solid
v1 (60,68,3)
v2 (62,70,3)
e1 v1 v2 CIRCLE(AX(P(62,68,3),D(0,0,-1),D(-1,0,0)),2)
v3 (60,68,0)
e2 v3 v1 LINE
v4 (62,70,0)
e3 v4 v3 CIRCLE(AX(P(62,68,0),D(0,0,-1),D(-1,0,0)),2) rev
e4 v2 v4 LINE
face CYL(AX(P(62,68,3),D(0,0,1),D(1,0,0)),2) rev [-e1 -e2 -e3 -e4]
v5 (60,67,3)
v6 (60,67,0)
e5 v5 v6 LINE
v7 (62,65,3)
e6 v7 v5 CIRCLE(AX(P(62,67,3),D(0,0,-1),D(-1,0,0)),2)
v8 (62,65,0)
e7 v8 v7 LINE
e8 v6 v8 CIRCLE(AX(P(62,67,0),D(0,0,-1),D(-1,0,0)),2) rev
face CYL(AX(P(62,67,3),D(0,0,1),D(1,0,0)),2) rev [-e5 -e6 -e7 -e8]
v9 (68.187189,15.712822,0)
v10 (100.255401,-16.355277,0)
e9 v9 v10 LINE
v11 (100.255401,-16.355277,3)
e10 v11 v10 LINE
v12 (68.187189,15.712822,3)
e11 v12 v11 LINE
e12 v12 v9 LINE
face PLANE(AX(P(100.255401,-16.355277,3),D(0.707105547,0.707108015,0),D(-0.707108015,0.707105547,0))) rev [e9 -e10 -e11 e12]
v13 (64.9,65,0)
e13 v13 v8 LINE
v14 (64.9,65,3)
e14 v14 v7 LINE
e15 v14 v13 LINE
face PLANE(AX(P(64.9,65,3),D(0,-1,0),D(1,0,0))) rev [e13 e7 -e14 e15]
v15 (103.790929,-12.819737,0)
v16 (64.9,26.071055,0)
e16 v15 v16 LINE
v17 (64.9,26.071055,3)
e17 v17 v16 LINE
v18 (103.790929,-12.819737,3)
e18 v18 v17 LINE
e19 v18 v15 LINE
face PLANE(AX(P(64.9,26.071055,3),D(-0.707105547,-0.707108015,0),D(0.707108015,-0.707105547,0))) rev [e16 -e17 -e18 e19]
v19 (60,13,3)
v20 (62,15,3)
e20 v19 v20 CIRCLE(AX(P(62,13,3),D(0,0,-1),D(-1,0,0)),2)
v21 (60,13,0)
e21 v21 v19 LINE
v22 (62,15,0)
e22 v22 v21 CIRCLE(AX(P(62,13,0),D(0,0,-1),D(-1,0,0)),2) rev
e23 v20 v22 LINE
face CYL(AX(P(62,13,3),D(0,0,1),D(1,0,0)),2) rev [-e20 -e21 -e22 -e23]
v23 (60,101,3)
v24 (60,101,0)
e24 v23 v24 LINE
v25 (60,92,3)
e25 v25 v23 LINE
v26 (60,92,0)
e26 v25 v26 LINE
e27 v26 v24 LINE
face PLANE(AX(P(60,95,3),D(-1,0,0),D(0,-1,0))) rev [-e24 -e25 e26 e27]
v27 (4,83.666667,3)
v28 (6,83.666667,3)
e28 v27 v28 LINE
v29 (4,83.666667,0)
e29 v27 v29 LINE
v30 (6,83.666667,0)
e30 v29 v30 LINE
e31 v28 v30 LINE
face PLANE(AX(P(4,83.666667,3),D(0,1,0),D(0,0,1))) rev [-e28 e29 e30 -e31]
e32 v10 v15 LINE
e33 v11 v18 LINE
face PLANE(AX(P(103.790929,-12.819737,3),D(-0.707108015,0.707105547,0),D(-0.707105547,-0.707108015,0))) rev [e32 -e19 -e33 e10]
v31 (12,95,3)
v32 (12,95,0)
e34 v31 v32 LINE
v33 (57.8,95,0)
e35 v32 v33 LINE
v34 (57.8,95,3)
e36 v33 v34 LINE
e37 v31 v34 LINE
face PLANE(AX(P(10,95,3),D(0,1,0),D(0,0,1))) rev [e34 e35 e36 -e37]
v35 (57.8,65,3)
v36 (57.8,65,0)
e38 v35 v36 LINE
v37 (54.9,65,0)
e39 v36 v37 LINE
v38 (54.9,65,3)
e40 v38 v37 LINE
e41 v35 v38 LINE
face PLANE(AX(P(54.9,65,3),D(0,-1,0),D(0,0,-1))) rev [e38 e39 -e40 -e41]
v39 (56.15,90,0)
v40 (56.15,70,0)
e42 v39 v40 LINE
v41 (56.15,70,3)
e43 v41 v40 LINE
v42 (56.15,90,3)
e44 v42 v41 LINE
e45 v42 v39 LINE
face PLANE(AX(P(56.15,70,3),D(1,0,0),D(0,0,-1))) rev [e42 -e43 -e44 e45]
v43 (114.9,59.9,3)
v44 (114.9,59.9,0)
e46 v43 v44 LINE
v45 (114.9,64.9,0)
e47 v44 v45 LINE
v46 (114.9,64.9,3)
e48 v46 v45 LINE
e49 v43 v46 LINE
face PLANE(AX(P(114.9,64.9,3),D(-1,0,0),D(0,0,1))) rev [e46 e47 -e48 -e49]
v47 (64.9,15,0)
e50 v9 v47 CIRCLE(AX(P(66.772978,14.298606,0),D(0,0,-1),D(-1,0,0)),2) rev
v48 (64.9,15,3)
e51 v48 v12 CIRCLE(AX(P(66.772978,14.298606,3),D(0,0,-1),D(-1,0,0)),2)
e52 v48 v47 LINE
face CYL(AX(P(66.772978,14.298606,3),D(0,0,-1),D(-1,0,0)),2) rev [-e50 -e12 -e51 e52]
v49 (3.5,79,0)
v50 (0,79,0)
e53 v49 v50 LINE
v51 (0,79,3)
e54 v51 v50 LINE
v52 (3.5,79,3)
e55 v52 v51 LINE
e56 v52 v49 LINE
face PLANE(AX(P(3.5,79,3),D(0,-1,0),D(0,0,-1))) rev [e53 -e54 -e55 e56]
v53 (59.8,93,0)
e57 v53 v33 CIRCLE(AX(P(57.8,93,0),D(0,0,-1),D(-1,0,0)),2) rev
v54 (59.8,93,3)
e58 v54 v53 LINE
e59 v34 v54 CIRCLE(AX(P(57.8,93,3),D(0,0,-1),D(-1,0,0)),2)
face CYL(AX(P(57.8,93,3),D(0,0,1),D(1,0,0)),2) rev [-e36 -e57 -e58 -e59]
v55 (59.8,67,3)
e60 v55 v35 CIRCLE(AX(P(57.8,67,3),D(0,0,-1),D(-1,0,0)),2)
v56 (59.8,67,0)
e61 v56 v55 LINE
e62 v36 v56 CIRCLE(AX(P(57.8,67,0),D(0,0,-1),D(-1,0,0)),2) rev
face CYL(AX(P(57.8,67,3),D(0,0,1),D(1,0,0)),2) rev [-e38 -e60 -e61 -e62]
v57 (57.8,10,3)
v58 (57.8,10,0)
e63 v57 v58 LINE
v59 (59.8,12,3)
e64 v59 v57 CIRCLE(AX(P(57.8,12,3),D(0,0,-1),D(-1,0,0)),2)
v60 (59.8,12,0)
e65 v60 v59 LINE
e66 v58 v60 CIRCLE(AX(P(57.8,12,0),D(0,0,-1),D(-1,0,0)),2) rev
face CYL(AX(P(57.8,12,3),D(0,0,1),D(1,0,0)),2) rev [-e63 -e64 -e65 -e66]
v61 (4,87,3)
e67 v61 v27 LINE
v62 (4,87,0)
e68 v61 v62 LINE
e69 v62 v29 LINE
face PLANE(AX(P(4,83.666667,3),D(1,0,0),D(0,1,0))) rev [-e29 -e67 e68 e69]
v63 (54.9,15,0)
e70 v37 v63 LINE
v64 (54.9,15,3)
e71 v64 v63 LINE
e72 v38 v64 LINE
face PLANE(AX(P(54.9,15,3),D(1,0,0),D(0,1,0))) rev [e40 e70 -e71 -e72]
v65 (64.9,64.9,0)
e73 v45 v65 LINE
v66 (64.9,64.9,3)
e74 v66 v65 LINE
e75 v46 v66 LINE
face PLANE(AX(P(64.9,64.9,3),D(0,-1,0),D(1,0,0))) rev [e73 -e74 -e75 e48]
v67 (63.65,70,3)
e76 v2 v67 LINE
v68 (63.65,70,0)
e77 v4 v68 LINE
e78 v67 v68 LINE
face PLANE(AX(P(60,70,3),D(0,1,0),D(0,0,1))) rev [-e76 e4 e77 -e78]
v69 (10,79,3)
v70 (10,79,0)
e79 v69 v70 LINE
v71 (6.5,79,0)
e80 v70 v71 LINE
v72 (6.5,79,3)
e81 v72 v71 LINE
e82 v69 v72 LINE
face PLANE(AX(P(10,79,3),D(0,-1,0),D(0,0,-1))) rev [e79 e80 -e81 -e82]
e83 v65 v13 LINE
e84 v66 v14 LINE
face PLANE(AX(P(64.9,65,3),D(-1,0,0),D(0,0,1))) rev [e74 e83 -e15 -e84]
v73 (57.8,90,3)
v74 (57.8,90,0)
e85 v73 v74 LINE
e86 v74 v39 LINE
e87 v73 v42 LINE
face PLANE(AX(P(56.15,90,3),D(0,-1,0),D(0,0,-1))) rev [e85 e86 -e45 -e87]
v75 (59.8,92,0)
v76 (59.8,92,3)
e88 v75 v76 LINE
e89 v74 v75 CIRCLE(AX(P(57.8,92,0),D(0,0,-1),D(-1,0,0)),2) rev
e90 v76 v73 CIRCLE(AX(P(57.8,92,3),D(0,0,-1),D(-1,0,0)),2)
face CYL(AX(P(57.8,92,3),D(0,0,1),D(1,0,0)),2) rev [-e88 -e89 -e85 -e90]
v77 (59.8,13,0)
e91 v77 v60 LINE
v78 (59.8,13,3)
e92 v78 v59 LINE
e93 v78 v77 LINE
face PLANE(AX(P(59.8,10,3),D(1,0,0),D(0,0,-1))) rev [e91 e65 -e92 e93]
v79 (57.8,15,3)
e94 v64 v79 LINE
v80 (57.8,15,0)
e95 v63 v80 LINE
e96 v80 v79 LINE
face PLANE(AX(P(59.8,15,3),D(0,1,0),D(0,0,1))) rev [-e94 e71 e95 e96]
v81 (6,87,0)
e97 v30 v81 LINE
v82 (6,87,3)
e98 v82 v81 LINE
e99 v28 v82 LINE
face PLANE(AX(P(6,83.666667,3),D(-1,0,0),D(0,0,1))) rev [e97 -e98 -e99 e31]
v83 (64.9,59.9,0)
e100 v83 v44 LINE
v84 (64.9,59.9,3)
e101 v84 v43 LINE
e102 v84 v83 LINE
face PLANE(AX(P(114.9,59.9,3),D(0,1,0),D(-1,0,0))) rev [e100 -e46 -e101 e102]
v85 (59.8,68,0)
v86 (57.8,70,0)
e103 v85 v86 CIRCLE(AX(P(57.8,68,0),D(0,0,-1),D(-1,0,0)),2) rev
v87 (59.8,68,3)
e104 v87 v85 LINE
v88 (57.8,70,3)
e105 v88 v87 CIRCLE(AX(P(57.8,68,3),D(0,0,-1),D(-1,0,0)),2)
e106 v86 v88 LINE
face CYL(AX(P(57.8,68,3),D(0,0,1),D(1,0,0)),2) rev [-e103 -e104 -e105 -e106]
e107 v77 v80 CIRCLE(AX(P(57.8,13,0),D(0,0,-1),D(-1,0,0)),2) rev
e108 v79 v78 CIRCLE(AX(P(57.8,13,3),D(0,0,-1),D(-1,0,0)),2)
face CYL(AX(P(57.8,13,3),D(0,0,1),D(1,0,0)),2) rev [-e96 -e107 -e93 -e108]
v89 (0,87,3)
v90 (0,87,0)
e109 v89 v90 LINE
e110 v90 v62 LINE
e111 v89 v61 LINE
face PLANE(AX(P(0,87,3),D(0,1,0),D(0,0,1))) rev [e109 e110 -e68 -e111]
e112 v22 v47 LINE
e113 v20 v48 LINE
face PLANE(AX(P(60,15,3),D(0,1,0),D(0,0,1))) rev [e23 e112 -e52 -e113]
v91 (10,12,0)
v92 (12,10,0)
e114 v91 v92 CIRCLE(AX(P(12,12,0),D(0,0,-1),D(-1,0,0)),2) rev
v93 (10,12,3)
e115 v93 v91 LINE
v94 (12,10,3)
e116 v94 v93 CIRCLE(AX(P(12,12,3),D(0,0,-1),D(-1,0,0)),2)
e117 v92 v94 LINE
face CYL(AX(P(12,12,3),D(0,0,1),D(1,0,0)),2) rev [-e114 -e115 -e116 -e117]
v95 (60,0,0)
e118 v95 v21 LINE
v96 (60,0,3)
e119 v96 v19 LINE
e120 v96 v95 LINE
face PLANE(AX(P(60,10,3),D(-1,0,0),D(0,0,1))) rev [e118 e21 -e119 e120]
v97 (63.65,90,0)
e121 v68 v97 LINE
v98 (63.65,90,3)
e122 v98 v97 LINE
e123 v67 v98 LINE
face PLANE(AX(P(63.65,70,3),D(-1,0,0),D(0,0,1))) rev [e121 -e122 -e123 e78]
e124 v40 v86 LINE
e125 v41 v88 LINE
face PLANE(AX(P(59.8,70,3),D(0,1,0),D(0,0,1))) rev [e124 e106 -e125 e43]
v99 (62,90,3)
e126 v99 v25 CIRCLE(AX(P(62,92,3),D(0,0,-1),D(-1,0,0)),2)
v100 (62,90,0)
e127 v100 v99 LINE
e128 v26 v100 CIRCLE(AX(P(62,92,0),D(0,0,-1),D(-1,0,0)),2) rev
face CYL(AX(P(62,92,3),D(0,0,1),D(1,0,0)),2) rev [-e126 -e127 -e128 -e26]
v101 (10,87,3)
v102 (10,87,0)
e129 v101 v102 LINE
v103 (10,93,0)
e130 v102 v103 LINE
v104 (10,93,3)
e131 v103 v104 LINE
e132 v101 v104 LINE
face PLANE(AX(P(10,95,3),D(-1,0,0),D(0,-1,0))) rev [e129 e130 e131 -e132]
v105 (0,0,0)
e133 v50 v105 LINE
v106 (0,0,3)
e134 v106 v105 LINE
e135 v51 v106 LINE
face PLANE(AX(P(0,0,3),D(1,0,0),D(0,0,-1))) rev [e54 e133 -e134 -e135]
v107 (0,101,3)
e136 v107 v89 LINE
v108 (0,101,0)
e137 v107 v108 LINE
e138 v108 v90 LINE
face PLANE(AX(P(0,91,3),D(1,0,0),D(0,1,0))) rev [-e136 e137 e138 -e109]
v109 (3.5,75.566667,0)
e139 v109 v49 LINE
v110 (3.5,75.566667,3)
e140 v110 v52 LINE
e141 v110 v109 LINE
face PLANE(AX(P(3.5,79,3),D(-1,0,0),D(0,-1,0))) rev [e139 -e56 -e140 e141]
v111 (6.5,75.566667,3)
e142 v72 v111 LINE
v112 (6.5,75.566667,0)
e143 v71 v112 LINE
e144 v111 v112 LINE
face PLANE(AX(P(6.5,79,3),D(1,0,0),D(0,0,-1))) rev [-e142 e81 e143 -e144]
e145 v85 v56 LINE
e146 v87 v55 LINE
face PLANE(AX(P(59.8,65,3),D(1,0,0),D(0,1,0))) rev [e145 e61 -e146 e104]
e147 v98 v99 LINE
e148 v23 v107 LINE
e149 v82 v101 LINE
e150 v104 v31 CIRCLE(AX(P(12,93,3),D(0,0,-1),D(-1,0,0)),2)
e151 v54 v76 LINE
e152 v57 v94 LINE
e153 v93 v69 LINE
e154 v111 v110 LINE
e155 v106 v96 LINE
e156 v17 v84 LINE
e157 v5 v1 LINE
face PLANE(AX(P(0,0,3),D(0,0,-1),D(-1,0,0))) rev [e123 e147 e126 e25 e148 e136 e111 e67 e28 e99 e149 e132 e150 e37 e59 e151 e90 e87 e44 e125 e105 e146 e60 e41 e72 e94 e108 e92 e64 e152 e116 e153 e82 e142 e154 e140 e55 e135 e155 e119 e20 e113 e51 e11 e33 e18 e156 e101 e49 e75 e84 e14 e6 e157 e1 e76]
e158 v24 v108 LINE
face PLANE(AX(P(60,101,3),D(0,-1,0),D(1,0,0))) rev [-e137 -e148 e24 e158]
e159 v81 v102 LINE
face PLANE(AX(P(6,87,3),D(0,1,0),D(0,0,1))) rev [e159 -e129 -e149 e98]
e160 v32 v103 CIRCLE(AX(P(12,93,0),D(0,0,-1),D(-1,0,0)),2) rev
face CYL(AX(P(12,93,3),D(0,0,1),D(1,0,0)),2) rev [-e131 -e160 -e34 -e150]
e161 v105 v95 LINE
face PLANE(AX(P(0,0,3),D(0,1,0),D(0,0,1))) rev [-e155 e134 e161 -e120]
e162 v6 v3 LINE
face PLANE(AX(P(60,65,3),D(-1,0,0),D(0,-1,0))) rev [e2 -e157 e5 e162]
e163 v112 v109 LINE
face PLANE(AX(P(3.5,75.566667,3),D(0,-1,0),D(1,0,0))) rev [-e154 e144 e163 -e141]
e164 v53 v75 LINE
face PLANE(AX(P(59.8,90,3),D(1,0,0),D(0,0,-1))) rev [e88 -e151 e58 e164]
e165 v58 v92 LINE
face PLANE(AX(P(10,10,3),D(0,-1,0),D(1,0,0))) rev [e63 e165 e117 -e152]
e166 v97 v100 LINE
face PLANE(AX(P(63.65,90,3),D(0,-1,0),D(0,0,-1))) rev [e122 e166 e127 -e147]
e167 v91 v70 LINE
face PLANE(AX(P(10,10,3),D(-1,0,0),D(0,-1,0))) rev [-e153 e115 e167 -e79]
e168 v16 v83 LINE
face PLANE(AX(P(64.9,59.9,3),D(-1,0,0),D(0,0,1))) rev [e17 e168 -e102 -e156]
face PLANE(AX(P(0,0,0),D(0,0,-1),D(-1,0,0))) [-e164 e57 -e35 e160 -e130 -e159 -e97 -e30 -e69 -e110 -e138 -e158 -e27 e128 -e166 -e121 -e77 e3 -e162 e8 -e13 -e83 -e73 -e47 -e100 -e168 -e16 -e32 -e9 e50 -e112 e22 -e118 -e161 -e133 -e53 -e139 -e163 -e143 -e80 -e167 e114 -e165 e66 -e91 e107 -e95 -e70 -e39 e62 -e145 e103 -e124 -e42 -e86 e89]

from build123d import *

# Parameters (mm, degrees)
BOSS_EXTRUDE1_DEPTH = 3
FILLET1_R           = 2


with BuildPart() as part:
    # Sketch2 → Boss-Extrude1 (new body)
    with BuildSketch(Plane.XY):
        Polygon((0, 0), (0, 79), (3.5, 79), (3.5, 75.566666667), (6.5, 75.566666667), (6.5, 79), (10, 79), (10, 10), (59.8, 10), (59.8, 15), (54.9, 15), (54.9, 65), (59.8, 65), (59.8, 70), (56.15, 70), (56.15, 90), (59.8, 90), (59.8, 95), (10, 95), (10, 87), (6, 87), (6, 83.666666667), (4, 83.666666667), (4, 87), (0, 87), (0, 91), (0, 101), (60, 101), (60, 95), (60, 90), (63.65, 90), (63.65, 70), (60, 70), (60, 65), (64.9, 65), (64.9, 64.9), (114.9, 64.9), (114.9, 59.9), (64.9, 59.9), (64.9, 26.071055471), (103.790928501, -12.819737276), (100.255400766, -16.355277353), (64.9, 19), (64.9, 15), (60, 15), (60, 10), (60, 0), align=None)
    extrude(amount=BOSS_EXTRUDE1_DEPTH)

    # Fillet1
    # the kernel refuses this fillet: 2 mm, written as the material it adds along each edge
    with BuildSketch(Plane(origin=(59.8, 15, 0), x_dir=(-1, 0, 0), z_dir=(0, 0, 1)), Plane(origin=(60, 15, 0), x_dir=(0, -1, 0), z_dir=(0, 0, 1)), Plane(origin=(60, 70, 0), x_dir=(0, -1, 0), z_dir=(0, 0, 1)), Plane(origin=(60, 65, 0), x_dir=(1, 0, 0), z_dir=(0, 0, 1)), Plane(origin=(59.8, 65, 0), x_dir=(0, 1, 0), z_dir=(0, 0, 1)), Plane(origin=(59.8, 70, 0), x_dir=(-1, 0, 0), z_dir=(0, 0, 1)), Plane(origin=(59.8, 95, 0), x_dir=(-1, 0, 0), z_dir=(0, 0, 1)), Plane(origin=(60, 90, 0), x_dir=(1, 0, 0), z_dir=(0, 0, 1)), Plane(origin=(59.8, 90, 0), x_dir=(0, 1, 0), z_dir=(0, 0, 1)), Plane(origin=(10, 10, 0), x_dir=(1, 0, 0), z_dir=(0, 0, 1)), Plane(origin=(10, 95, 0), x_dir=(0, -1, 0), z_dir=(0, 0, 1)), Plane(origin=(59.8, 10, 0), x_dir=(0, 1, 0), z_dir=(0, 0, 1))) as fillet1_piece_1:
        with BuildLine():
            CenterArc((FILLET1_R, FILLET1_R), FILLET1_R, 180, 90)
            Line((0, FILLET1_R), (-FILLET1_R * 0.02, FILLET1_R))
            Line((-FILLET1_R * 0.02, FILLET1_R), (-FILLET1_R * 0.02, -FILLET1_R * 0.02))
            Line((-FILLET1_R * 0.02, -FILLET1_R * 0.02), (FILLET1_R, -FILLET1_R * 0.02))
            Line((FILLET1_R, -FILLET1_R * 0.02), (FILLET1_R, 0))
        make_face()
    extrude(amount=3)
    with BuildSketch(Plane(origin=(64.9, 19, 0), x_dir=(0, -1, 0), z_dir=(0, 0, 1))) as fillet1_piece_2:
        with BuildLine():
            CenterArc((4.70139372, 1.87297807), FILLET1_R, 135.0001, 114.469955898)
            Line((3.287177689, 3.287189164), (3.258893369, 3.315473386))
            Line((3.258893369, 3.315473386), (-0.028284321, 0.028284222))
            Line((-0.028284321, 0.028284222), (0, -0.04))
            ThreePointArc((0, -0.04), (2, -0.04), (3.985972126, -0.037459561))
            Line((3.985972126, -0.037459561), (4, 0))
        make_face()
    extrude(amount=3)


solid = part.part
